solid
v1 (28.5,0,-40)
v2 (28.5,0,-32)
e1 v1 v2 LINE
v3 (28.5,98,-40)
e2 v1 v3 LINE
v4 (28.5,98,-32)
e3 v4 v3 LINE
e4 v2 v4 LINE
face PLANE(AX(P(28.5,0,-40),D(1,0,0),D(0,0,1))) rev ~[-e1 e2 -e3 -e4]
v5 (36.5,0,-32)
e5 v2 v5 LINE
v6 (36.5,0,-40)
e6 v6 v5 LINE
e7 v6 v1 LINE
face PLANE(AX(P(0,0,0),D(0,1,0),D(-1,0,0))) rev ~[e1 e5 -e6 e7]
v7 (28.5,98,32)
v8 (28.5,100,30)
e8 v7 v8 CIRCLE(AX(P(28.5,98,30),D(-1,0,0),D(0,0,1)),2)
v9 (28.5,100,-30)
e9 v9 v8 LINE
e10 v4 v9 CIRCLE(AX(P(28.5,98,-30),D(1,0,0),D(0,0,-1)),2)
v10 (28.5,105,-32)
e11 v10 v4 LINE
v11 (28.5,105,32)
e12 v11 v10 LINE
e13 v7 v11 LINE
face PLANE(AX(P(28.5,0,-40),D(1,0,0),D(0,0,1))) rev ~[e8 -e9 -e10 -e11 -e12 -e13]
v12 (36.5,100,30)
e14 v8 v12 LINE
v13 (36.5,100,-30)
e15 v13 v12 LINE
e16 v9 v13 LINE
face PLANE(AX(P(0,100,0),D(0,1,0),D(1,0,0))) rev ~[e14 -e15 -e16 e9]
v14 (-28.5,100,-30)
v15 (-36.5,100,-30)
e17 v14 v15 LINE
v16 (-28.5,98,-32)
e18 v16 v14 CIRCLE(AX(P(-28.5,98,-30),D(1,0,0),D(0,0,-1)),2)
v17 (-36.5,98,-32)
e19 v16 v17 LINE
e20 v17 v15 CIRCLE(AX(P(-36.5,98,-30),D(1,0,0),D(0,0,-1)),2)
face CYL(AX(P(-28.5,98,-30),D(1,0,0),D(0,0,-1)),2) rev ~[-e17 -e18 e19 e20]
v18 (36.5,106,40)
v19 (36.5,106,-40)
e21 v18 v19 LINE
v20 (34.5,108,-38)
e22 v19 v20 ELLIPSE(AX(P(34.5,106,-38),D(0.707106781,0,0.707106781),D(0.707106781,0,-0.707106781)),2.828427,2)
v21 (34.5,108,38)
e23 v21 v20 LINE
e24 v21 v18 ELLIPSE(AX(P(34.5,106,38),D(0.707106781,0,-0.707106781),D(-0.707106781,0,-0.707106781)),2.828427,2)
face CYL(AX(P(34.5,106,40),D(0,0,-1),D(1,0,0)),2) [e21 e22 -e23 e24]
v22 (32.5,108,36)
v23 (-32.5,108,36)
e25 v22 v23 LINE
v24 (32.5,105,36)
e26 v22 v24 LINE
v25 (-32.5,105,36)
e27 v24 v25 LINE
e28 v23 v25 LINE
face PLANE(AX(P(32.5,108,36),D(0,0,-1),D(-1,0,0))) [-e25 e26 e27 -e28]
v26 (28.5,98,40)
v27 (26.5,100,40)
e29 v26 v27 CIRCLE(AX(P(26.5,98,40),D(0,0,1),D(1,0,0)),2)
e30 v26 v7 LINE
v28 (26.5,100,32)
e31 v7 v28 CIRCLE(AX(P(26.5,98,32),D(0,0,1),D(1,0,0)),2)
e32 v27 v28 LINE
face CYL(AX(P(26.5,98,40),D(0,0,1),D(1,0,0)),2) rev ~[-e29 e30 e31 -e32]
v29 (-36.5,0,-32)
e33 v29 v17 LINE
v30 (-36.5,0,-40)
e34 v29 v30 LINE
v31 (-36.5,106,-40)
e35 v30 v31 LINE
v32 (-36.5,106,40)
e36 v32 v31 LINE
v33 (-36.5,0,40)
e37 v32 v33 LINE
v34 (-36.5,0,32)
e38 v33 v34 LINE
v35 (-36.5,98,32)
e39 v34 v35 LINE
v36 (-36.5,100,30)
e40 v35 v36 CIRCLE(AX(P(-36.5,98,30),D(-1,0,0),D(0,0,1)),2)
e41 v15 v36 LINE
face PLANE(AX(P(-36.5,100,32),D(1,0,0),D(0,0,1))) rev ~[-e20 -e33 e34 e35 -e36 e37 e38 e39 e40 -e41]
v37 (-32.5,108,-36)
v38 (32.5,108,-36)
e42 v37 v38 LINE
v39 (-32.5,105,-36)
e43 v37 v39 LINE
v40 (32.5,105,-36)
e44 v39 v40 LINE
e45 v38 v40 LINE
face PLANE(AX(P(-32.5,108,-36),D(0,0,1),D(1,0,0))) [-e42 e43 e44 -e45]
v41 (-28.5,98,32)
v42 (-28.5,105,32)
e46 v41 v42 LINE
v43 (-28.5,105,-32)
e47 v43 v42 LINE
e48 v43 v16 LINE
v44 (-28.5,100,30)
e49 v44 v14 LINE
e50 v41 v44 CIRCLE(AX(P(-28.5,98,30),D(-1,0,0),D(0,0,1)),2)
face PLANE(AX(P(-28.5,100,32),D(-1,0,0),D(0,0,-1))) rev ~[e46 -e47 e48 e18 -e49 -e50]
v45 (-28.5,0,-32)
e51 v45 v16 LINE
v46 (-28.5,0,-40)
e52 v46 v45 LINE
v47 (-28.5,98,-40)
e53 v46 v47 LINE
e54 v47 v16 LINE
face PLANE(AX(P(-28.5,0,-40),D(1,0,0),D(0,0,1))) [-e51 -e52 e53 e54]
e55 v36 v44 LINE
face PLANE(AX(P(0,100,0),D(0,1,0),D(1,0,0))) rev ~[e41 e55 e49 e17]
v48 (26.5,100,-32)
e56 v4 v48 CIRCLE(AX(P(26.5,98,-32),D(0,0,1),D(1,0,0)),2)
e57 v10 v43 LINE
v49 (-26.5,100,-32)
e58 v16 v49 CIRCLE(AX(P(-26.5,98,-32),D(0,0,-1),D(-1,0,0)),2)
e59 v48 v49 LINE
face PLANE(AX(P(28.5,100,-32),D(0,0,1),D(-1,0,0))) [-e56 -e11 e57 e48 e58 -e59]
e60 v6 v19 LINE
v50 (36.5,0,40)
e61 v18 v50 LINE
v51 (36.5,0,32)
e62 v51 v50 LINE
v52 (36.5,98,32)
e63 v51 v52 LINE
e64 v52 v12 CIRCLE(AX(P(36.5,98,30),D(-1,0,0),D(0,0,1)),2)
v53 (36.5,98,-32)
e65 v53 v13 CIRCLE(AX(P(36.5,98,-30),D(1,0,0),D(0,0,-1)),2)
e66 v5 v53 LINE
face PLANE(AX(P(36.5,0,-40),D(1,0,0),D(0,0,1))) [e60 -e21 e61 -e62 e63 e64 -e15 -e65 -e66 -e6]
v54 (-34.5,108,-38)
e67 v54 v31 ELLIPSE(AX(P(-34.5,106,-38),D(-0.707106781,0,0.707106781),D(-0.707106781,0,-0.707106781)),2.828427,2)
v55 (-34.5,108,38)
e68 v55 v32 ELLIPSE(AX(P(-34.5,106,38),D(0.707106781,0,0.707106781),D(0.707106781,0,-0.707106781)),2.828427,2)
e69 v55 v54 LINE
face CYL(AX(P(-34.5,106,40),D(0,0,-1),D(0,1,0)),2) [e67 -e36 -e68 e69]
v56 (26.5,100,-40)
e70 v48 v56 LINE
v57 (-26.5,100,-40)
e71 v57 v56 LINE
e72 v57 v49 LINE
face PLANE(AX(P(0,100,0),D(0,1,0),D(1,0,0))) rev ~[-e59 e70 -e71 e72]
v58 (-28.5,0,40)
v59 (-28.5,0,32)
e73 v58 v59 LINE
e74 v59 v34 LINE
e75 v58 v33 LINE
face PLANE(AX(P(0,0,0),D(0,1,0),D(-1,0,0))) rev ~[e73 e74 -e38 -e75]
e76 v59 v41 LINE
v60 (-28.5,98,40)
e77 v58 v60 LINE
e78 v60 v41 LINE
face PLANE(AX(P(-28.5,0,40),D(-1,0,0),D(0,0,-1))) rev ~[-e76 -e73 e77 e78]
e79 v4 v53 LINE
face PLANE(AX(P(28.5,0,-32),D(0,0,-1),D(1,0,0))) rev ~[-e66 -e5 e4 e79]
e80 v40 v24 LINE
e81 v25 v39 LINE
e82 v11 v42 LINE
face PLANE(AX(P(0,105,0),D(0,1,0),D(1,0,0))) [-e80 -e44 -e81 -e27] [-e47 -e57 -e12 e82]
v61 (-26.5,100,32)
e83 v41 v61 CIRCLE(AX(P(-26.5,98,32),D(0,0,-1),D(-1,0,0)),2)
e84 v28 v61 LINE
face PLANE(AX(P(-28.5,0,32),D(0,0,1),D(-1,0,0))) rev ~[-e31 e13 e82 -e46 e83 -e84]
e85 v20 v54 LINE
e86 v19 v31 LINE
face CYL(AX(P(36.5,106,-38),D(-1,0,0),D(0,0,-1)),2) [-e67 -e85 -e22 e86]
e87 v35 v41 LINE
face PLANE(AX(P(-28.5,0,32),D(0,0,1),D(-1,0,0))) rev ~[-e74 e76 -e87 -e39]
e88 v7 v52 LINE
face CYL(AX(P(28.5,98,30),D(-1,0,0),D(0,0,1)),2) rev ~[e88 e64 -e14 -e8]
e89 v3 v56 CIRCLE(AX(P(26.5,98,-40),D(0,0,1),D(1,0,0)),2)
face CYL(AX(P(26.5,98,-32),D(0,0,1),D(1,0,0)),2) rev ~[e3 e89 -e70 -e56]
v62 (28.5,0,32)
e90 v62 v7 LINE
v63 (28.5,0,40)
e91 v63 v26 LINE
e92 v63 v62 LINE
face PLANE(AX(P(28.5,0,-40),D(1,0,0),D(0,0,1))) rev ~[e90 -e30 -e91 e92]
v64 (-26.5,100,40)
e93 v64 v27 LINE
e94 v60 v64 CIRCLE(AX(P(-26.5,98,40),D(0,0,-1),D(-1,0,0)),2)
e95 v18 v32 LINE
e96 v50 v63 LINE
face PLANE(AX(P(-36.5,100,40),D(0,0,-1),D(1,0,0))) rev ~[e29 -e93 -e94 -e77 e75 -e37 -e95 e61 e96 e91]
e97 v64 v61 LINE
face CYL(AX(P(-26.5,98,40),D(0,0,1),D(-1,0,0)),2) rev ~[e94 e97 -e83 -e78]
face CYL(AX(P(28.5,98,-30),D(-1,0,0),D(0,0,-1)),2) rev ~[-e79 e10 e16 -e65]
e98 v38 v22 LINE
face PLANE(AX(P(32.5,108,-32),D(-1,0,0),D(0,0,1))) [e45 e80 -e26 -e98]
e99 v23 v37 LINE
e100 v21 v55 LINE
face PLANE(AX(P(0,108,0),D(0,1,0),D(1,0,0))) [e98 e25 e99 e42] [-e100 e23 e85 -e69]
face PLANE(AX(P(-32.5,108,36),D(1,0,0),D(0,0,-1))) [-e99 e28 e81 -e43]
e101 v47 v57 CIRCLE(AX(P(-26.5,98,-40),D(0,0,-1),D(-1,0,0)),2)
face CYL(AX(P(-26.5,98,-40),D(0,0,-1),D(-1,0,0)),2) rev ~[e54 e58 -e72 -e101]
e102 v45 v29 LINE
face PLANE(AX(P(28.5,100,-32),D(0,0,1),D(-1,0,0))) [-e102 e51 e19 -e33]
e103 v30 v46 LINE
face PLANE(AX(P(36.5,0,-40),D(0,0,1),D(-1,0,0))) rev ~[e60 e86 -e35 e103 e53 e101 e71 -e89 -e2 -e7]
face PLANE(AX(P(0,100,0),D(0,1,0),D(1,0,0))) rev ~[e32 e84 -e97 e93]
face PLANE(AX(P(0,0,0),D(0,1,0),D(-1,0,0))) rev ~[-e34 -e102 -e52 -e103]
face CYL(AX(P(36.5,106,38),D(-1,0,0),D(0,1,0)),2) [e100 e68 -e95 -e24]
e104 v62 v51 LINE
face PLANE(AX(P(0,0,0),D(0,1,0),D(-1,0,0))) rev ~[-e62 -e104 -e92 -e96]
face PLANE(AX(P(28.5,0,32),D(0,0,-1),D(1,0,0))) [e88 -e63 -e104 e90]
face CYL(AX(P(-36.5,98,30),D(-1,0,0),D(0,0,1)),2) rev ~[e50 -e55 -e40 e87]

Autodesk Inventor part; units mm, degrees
ref_plane "YZ Plane" through (0, 0, 0) normal (1, 0, 0) x (0, 1, 0)
ref_plane "XZ Plane" through (0, 0, 0) normal (0, 1, 0) x (-1, 0, 0)
ref_plane "XY Plane" through (0, 0, 0) normal (0, 0, 1) x (1, 0, 0)
sketch "Sketch1" plane through (0, 0, 0) normal (0, 1, 0) x (-1, 0, 0)
  line L0 (-36.5, -40) -> (-36.5, 40)
  line L1 (36.5, 40) -> (36.5, -40)
  line L2 (-36.5, 40) -> (36.5, -40) construction
  line L3 (36.5, 40) -> (-36.5, -40) construction
  line L4 (36.5, 40) -> (36.5, 13)
  line L5 (-36.5, 40) -> (36.5, 40)
  line L6 (-36.5, -40) -> (-9.5, -40)
  line L7 (-36.5, -40) -> (18.5, -40)
  line L8 (36.5, -40) -> (-36.5, -40)
  line L9 (36.5, -40) -> (28.5, -40)
  line L10 (28.5, -40) -> (28.5, -32)
  line L11 (28.5, -32) -> (36.5, -32)
  line L12 (36.5, -32) -> (36.5, -40)
  line L13 (36.5, 40) -> (28.5, 40)
  line L14 (28.5, 40) -> (28.5, 32)
  line L15 (28.5, 32) -> (36.5, 32)
  line L16 (36.5, 32) -> (36.5, 40)
  line L17 (-36.5, 40) -> (-28.5, 40)
  line L18 (-28.5, 40) -> (-28.5, 32)
  line L19 (-28.5, 32) -> (-36.5, 32)
  line L20 (-36.5, 32) -> (-36.5, 40)
  line L21 (-36.5, -40) -> (-28.5, -40)
  line L22 (-28.5, -40) -> (-28.5, -32)
  line L23 (-28.5, -32) -> (-36.5, -32)
  line L24 (-36.5, -32) -> (-36.5, -40)
  dimension "d0" = 73
  dimension "d1" = 80
  dimension "d10" = 8
  dimension "d11" = 8
  dimension "d12" = 8
  dimension "d13" = 8
  dimension "d14" = 8
  dimension "d15" = 8
  dimension "d16" = 8
  dimension "d17" = 8
extrude "Extrusion1" add sketch "Sketch1" along normal blind 100 contours L0 L23 L22 L6 | L0 L5 L18 L19 | L10 L11 L1 L8 | L5 L1 L15 L14
sketch "Sketch2" plane through (0, 100, 0) normal (0, 1, 0) x (1, 0, 0)
  line L0 (-36.5, -40) -> (-28.5, -40) projected
  line L1 (-28.5, 32) -> (-28.5, 40) projected
  line L2 (-36.5, -40) -> (-28.5, -40)
  line L3 (-28.5, -40) -> (-28.5, 40)
  line L4 (-28.5, 40) -> (-36.5, 40)
  line L5 (-36.5, 40) -> (-36.5, -40)
  line L6 (-36.5, -32) -> (-36.5, -40) projected
  line L7 (36.5, -40) -> (36.5, -32) projected
  line L8 (-36.5, -40) -> (36.5, -40)
  line L9 (36.5, -40) -> (36.5, -32)
  line L10 (36.5, -32) -> (-36.5, -32)
  line L11 (-36.5, -32) -> (-36.5, -40)
  line L12 (28.5, -32) -> (28.5, -40) projected
  line L13 (36.5, 40) -> (28.5, 40) projected
  line L14 (28.5, -32) -> (36.5, -32)
  line L15 (36.5, -32) -> (36.5, 40)
  line L16 (36.5, 40) -> (28.5, 40)
  line L17 (28.5, 40) -> (28.5, -32)
  line L18 (-28.5, 32) -> (-28.5, 40) projected
  line L19 (28.5, 40) -> (28.5, 32) projected
  line L20 (-28.5, 40) -> (28.5, 40)
  line L21 (28.5, 40) -> (28.5, 32)
  line L22 (28.5, 32) -> (-28.5, 32)
  line L23 (-28.5, 32) -> (-28.5, 40)
  point P0 (0, 0)
extrude "Extrusion2" add sketch "Sketch2" along normal blind 8 contours L5 L10 L3 L0 | L3 L10 L12 L8 | L5 L4 L1 L3 L10 | L12 L10 L7 L8 | L1 L20 L17 L22 | L17 L13 L15 L10
sketch "Sketch3" plane through (0, 108, 0) normal (0, 1, 0) x (1, 0, 0)
  line L0 (28.5, -32) -> (-28.5, -32) projected
  line L1 (28.5, 32) -> (36.5, 32) projected
  line L2 (-28.5, -32) -> (28.5, -32)
  line L3 (28.5, -32) -> (28.5, 32)
  line L4 (28.5, 32) -> (-28.5, 32)
  line L5 (-28.5, 32) -> (-28.5, -32)
  line L6 (32.5, 36) -> (32.5, -36)
  line L7 (32.5, -36) -> (-32.5, -36)
  line L8 (-32.5, -36) -> (-32.5, 36)
  line L9 (-32.5, 36) -> (32.5, 36)
  point P0 (0, 0)
  dimension "d22" = 4
extrude "Extrusion3" cut sketch "Sketch3" against normal blind 3
fillet "Fillet1" radius 2 8 edges at (32.5, 100, 32) (-28.5, 100, -36) (-28.5, 100, 36) (28.5, 100, -36) (-32.5, 100, 32) (-32.5, 100, -32) (28.5, 100, 36) (32.5, 100, -32)
fillet "Fillet2" radius 2 4 edges at (-36.5, 108, 0) (0, 108, 40) (36.5, 108, 0) (0, 108, -40)
properties part number "Hood_base"
